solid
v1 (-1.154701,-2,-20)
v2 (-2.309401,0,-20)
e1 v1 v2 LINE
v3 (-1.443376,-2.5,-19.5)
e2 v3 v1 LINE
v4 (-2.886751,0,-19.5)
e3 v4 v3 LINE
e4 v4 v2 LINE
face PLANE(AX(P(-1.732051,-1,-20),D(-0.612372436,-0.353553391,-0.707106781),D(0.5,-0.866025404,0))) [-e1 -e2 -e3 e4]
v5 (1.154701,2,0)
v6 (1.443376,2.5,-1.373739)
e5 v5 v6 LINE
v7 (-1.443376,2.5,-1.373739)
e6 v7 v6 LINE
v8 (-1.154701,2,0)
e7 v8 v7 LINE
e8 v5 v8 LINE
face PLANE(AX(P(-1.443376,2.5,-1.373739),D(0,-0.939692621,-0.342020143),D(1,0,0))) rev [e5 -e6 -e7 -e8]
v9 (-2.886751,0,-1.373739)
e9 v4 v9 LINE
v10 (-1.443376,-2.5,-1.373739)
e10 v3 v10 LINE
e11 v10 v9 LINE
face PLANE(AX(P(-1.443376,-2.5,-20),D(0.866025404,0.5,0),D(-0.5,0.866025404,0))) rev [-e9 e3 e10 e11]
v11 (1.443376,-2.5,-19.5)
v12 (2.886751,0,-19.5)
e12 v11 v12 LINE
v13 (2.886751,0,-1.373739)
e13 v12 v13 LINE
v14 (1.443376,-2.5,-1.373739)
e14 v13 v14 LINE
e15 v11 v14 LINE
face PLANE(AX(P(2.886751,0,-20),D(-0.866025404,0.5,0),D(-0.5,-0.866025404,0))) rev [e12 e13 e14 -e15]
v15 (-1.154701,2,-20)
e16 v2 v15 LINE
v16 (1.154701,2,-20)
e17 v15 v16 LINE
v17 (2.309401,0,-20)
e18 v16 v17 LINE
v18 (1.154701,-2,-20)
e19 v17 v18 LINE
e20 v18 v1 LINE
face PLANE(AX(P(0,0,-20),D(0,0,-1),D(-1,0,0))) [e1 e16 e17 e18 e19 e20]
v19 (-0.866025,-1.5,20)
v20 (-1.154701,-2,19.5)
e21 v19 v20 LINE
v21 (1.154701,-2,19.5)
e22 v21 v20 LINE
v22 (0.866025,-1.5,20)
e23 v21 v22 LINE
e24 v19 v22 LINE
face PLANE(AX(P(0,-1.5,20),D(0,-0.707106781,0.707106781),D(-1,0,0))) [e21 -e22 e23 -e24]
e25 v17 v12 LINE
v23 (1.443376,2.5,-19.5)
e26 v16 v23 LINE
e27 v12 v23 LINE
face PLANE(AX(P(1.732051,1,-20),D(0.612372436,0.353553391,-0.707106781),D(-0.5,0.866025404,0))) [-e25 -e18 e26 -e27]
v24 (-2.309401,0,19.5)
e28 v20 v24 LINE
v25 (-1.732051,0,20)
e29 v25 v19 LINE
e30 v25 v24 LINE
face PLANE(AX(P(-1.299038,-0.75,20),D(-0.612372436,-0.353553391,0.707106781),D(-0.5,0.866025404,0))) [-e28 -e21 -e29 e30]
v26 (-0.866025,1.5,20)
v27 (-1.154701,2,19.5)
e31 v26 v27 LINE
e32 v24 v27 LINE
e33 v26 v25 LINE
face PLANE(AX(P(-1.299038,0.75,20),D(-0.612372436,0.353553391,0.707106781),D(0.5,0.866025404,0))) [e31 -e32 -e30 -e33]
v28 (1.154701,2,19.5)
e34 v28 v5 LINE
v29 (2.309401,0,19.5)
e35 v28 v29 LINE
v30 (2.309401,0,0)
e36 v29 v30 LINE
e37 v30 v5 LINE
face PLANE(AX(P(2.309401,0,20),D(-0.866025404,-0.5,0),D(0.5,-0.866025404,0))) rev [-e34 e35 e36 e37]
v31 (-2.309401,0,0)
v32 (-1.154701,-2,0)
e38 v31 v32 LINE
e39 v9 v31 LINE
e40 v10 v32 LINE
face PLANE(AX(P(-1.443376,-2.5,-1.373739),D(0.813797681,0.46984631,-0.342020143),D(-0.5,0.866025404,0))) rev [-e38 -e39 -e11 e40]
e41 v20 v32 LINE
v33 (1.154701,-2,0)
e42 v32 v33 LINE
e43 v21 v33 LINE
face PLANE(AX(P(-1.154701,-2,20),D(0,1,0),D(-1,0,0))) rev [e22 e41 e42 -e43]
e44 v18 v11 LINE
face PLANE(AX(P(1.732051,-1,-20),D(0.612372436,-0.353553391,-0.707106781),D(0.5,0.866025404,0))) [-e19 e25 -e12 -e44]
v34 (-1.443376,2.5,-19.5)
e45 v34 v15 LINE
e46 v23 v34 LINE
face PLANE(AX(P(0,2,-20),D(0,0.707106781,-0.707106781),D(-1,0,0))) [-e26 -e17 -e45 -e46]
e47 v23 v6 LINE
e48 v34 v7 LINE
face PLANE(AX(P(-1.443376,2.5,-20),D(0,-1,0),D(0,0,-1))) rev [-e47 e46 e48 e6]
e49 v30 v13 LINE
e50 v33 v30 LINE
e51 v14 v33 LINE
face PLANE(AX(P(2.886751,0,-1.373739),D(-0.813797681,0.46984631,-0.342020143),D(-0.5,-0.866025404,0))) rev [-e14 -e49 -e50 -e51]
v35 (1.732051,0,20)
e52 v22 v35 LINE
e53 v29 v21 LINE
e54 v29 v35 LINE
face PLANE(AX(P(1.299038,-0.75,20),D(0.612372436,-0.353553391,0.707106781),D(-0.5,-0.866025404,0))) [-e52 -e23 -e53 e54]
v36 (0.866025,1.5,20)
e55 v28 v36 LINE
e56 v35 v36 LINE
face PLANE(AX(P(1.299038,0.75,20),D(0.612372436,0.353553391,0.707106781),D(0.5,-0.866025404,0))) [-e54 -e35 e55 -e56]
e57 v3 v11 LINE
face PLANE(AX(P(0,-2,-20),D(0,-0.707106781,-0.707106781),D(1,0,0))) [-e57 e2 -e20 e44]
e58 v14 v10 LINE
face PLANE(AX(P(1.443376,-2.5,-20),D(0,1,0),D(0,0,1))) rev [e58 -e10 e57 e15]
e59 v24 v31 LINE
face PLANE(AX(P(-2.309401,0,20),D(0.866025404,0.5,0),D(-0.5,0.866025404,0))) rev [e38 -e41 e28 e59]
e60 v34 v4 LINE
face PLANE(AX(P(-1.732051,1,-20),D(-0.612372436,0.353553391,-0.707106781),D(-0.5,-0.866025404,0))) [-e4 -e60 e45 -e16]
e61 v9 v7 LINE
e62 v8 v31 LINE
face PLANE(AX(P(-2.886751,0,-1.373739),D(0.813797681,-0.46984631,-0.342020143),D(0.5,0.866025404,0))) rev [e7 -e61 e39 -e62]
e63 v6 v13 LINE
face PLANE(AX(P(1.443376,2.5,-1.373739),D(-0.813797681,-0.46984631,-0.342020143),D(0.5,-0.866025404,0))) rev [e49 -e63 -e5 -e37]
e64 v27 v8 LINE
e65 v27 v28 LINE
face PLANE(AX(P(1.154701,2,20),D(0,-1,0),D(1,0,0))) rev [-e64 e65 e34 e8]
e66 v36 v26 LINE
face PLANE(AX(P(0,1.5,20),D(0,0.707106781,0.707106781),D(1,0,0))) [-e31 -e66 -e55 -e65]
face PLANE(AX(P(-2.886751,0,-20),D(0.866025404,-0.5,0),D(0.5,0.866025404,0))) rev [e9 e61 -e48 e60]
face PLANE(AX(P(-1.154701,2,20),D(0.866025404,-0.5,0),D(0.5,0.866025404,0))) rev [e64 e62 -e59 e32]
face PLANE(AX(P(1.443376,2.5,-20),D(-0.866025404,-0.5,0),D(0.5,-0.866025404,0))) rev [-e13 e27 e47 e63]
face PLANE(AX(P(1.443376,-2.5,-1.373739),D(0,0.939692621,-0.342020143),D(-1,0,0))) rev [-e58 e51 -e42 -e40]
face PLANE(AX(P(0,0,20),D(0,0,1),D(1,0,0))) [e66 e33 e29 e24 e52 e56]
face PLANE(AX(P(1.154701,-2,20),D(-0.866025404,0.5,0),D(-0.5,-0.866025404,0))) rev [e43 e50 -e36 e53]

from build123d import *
from OCP.BRepFilletAPI import BRepFilletAPI_MakeChamfer

# Parameters (mm, degrees)
EXTRUDE_1_DEPTH  = 20
CHAMFER_1_SIZE   = 0.5
EXTRUDE_2_DEPTH  = 20
CHAMFER_3_SIZE   = 1.37373871
CHAMFER_3_SIZE_2 = 0.5
CHAMFER_4_SIZE   = 0.5


with BuildPart() as part:
    # 草图1 → 凸台-拉伸1 (new body)
    with BuildSketch(Plane.XY):
        Polygon((2.309401077, 0), (1.154700538, 2), (-1.154700538, 2), (-2.309401077, 0), (-1.154700538, -2), (1.154700538, -2), align=None)
    extrude(amount=EXTRUDE_1_DEPTH)

    # 倒角1
    chamfer_1_edges = [part.edges().sort_by_distance(p)[0] for p in [
        (0, 2, 20),
        (-1.732050808, 1, 20),
        (-1.732050808, -1, 20),
        (0, -2, 20),
        (1.732050808, -1, 20),
        (1.732050808, 1, 20),
    ]]
    chamfer(chamfer_1_edges, length=CHAMFER_1_SIZE)

    # 草图2 → 凸台-拉伸2 (add)
    with BuildSketch(Plane(origin=(0, 0, 0), x_dir=(-1, 0, 0), z_dir=(0, 0, -1))):
        Polygon((2.886751346, 0), (1.443375673, 2.5), (-1.443375673, 2.5), (-2.886751346, 0), (-1.443375673, -2.5), (1.443375673, -2.5), align=None)
    extrude(amount=EXTRUDE_2_DEPTH)

    # 倒角3
    chamfer_3_edges_1 = [part.edges().sort_by_distance(p)[0] for p in [
        (-2.165063509, -1.25, 0),
    ]]
    chamfer_3_side_1 = [part.faces().sort_by_distance(p)[0] for p in [
        (-2.165063509, -1.25, -0.01),
    ]]
    chamfer_3_edges_2 = [part.edges().sort_by_distance(p)[0] for p in [
        (-2.165063509, 1.25, 0),
    ]]
    chamfer_3_side_2 = [part.faces().sort_by_distance(p)[0] for p in [
        (-2.165063509, 1.25, -0.01),
    ]]
    chamfer_3_edges_3 = [part.edges().sort_by_distance(p)[0] for p in [
        (0, 2.5, 0),
    ]]
    chamfer_3_side_3 = [part.faces().sort_by_distance(p)[0] for p in [
        (0, 2.5, -0.01),
    ]]
    chamfer_3_edges_4 = [part.edges().sort_by_distance(p)[0] for p in [
        (2.165063509, 1.25, 0),
    ]]
    chamfer_3_side_4 = [part.faces().sort_by_distance(p)[0] for p in [
        (2.156403255, 1.245, 0),
    ]]
    chamfer_3_edges_5 = [part.edges().sort_by_distance(p)[0] for p in [
        (2.165063509, -1.25, 0),
    ]]
    chamfer_3_side_5 = [part.faces().sort_by_distance(p)[0] for p in [
        (2.156403255, -1.245, 0),
    ]]
    chamfer_3_edges_6 = [part.edges().sort_by_distance(p)[0] for p in [
        (0, -2.5, 0),
    ]]
    chamfer_3_side_6 = [part.faces().sort_by_distance(p)[0] for p in [
        (0, -2.49, 0),
    ]]
    chamfer_3 = BRepFilletAPI_MakeChamfer(part.part.solid().wrapped)
    for e in chamfer_3_edges_1:
        chamfer_3.Add(CHAMFER_3_SIZE - 0.0001, CHAMFER_3_SIZE_2 - 0.0001, e.wrapped, chamfer_3_side_1[0].wrapped)
    for e in chamfer_3_edges_2:
        chamfer_3.Add(CHAMFER_3_SIZE - 0.0001, CHAMFER_3_SIZE_2 - 0.0001, e.wrapped, chamfer_3_side_2[0].wrapped)
    for e in chamfer_3_edges_3:
        chamfer_3.Add(CHAMFER_3_SIZE - 0.0001, CHAMFER_3_SIZE_2 - 0.0001, e.wrapped, chamfer_3_side_3[0].wrapped)
    for e in chamfer_3_edges_4:
        chamfer_3.Add(CHAMFER_3_SIZE_2 - 0.0001, CHAMFER_3_SIZE - 0.0001, e.wrapped, chamfer_3_side_4[0].wrapped)
    for e in chamfer_3_edges_5:
        chamfer_3.Add(CHAMFER_3_SIZE_2 - 0.0001, CHAMFER_3_SIZE - 0.0001, e.wrapped, chamfer_3_side_5[0].wrapped)
    for e in chamfer_3_edges_6:
        chamfer_3.Add(CHAMFER_3_SIZE_2 - 0.0001, CHAMFER_3_SIZE - 0.0001, e.wrapped, chamfer_3_side_6[0].wrapped)
    add(Compound.cast(chamfer_3.Shape()), mode=Mode.REPLACE)  # a hair under: the kernel refuses the full size

    # 倒角4
    chamfer_4_edges = [part.edges().sort_by_distance(p)[0] for p in [
        (-2.165063509, -1.25, -20),
        (-2.165063509, 1.25, -20),
        (0, 2.5, -20),
        (2.165063509, 1.25, -20),
        (2.165063509, -1.25, -20),
        (0, -2.5, -20),
    ]]
    chamfer(chamfer_4_edges, length=CHAMFER_4_SIZE)


solid = part.part
